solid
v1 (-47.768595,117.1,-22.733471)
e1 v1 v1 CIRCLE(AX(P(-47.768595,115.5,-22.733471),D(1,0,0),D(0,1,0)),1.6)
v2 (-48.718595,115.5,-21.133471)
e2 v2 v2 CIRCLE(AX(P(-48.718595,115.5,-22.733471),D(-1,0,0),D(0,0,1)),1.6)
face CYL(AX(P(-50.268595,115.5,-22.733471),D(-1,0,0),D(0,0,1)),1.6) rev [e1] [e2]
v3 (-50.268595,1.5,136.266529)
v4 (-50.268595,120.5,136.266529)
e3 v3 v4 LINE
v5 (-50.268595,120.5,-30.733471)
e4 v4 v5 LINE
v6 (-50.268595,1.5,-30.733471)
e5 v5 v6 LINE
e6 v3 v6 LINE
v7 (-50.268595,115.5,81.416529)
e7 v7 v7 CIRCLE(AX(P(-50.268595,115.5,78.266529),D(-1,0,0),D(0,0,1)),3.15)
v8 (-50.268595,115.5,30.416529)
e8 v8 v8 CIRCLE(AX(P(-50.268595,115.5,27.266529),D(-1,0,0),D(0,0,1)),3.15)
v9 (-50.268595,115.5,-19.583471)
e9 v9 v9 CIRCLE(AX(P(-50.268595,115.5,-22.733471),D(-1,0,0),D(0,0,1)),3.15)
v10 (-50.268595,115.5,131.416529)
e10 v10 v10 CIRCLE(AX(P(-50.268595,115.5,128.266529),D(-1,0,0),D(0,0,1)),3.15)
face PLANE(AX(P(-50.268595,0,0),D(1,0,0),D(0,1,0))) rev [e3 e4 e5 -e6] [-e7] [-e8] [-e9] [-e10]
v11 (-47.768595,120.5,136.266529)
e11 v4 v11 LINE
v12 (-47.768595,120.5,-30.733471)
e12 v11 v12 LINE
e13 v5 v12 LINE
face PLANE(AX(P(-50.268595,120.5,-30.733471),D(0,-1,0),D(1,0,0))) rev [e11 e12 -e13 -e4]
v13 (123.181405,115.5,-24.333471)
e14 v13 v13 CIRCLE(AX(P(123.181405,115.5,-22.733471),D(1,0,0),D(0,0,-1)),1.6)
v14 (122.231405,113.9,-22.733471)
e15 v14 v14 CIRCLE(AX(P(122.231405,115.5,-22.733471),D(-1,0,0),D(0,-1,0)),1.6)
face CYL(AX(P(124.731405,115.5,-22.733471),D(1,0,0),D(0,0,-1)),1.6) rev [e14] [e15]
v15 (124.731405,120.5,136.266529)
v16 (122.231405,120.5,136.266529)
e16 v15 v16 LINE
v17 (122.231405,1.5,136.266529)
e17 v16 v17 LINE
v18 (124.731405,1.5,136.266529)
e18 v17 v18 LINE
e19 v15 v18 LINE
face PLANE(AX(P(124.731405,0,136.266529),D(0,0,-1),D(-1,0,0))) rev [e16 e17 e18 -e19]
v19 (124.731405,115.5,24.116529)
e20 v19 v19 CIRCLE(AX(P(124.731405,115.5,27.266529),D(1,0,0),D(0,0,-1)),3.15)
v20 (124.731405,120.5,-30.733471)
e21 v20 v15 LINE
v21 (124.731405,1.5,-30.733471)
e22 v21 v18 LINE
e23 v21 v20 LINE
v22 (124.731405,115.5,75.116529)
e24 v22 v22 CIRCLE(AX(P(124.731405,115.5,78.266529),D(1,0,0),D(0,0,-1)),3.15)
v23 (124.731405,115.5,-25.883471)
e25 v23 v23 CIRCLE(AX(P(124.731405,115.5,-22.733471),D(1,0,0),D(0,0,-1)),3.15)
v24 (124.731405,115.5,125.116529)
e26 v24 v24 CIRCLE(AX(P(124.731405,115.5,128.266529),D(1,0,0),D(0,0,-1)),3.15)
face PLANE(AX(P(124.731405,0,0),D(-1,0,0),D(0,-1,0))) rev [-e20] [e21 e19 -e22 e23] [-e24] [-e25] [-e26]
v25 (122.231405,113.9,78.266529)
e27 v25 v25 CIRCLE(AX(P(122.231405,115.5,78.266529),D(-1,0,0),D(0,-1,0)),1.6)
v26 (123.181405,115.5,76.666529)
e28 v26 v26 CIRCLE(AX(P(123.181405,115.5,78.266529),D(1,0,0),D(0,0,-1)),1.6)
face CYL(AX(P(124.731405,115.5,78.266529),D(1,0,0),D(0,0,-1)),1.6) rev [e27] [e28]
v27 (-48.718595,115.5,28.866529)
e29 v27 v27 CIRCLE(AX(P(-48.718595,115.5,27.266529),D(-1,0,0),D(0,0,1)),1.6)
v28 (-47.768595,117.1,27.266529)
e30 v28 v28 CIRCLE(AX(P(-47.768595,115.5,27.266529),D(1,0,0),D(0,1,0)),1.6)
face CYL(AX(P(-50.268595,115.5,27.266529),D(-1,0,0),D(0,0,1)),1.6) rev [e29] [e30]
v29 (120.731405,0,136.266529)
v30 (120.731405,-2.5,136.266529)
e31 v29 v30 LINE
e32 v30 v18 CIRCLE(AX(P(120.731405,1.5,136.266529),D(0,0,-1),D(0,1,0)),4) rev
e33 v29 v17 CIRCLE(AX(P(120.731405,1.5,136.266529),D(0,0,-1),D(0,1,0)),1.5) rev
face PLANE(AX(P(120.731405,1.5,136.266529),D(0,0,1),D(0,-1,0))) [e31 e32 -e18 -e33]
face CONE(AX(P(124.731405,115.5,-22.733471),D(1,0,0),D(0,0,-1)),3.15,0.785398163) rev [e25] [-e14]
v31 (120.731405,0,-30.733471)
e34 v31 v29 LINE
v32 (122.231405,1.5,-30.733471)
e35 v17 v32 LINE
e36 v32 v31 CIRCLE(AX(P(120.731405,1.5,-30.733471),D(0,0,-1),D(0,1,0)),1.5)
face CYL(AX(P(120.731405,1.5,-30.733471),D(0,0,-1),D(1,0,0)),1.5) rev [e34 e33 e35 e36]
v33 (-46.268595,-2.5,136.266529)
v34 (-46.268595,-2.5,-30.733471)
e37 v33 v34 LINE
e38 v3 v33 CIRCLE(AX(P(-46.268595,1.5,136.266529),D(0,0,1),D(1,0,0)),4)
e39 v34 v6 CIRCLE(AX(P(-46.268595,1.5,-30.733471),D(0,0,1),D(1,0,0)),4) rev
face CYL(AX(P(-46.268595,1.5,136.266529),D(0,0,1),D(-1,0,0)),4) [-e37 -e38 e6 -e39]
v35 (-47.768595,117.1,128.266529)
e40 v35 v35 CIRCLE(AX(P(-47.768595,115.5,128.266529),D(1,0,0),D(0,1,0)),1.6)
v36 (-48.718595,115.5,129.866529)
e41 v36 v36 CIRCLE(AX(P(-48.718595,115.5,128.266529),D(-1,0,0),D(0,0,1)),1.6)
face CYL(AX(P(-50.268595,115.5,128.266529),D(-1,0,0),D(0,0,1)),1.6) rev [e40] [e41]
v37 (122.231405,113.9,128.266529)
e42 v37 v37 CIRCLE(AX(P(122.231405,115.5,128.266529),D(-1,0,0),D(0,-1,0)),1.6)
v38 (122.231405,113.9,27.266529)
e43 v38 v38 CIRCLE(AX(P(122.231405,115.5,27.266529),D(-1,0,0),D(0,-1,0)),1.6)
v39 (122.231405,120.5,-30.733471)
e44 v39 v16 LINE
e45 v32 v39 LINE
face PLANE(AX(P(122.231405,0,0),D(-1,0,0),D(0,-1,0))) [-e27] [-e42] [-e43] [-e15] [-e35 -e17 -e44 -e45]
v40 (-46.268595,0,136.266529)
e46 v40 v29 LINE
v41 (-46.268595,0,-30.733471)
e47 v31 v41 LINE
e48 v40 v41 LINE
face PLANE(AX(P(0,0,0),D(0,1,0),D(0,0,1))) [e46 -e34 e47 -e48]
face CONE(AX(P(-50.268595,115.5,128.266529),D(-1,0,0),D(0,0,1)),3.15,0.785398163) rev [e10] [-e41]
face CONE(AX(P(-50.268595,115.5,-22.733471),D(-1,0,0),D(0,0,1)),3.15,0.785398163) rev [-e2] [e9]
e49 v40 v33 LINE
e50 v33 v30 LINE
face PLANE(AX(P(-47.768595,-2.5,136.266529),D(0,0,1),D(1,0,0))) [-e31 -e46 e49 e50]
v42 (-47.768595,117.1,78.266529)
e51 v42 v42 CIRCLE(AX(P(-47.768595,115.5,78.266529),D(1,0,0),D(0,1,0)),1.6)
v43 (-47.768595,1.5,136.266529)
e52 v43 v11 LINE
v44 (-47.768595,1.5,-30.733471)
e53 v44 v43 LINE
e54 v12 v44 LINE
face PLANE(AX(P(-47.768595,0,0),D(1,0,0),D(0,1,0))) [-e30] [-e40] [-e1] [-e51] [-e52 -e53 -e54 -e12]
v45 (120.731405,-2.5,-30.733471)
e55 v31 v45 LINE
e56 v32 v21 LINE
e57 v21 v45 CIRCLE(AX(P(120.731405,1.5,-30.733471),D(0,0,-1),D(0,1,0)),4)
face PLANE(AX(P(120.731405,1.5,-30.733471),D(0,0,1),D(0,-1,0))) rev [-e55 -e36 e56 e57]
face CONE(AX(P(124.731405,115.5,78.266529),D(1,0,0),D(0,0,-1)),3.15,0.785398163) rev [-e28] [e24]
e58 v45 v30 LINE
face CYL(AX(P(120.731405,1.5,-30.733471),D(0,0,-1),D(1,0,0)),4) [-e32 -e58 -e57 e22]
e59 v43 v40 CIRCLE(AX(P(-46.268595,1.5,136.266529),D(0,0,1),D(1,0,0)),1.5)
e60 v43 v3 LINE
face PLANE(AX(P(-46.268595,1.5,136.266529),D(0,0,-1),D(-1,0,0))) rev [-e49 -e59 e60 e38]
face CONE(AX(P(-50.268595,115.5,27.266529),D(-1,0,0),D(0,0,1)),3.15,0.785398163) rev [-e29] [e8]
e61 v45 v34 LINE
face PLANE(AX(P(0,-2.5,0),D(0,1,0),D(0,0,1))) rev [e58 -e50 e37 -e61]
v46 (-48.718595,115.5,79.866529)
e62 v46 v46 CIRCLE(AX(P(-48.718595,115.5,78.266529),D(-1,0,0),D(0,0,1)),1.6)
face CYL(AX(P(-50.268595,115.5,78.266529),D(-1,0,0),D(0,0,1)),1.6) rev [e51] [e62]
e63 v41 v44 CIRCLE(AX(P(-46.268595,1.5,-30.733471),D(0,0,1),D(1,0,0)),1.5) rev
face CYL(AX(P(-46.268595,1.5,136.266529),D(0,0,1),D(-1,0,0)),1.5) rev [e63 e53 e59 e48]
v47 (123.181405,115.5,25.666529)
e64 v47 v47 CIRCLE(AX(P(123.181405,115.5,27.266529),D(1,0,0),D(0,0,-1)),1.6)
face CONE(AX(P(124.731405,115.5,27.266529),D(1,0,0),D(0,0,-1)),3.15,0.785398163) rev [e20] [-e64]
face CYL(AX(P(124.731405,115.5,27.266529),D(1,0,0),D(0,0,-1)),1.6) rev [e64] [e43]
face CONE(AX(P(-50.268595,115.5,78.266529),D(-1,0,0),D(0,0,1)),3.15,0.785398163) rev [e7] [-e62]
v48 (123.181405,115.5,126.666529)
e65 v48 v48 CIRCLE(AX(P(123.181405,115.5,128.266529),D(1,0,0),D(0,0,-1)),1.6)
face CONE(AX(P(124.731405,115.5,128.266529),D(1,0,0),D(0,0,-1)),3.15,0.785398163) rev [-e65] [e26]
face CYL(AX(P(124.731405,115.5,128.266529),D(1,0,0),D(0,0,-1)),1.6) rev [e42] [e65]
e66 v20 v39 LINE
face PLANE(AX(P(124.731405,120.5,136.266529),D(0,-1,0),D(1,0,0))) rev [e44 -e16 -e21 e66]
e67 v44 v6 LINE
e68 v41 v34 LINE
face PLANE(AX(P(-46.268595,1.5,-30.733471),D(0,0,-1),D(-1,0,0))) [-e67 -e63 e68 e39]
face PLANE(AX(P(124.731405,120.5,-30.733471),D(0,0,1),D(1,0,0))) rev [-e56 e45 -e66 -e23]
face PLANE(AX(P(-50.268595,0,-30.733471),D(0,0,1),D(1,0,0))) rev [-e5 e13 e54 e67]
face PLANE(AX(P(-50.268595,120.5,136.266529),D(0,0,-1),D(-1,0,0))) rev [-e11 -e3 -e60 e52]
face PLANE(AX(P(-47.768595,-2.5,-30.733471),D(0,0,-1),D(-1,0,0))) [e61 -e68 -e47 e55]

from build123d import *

# Parameters (mm, degrees)
SKETCH_238_W                                   = 170
SKETCH_238_H                                   = 167
BASE_FLANGE1_DEPTH                             = 2.5
EDGE_FLANGE1_STRIP_W                           = 13
EDGE_FLANGE1_STRIP_H                           = 2.5
EDGE_FLANGE1_STRIP_CUT_DEPTH                   = 167
EDGE_FLANGE1_DEPTH                             = 167
EDGE_FLANGE2_STRIP_W                           = 13
EDGE_FLANGE2_STRIP_H                           = 2.5
EDGE_FLANGE2_STRIP_CUT_DEPTH                   = 167
EDGE_FLANGE2_DEPTH                             = 167
CSK_FOR_M3_FLAT_HEAD_MACHINE_SCREW1_AT_2_COUNT = 2
CSK_FOR_M3_FLAT_HEAD_MACHINE_SCREW1_AT_2_PITCH = 50
CSK_FOR_M3_FLAT_HEAD_MACHINE_SCREW1_AT_3_COUNT = 2
CSK_FOR_M3_FLAT_HEAD_MACHINE_SCREW1_AT_3_PITCH = 101
CSK_FOR_M3_FLAT_HEAD_MACHINE_SCREW1_AT_4_COUNT = 2
CSK_FOR_M3_FLAT_HEAD_MACHINE_SCREW1_AT_4_PITCH = 151
CSK_FOR_M3_FLAT_HEAD_MACHINE_SCREW2_AT_2_COUNT = 2
CSK_FOR_M3_FLAT_HEAD_MACHINE_SCREW2_AT_2_PITCH = 50
CSK_FOR_M3_FLAT_HEAD_MACHINE_SCREW2_AT_3_COUNT = 2
CSK_FOR_M3_FLAT_HEAD_MACHINE_SCREW2_AT_3_PITCH = 101
CSK_FOR_M3_FLAT_HEAD_MACHINE_SCREW2_AT_4_COUNT = 2
CSK_FOR_M3_FLAT_HEAD_MACHINE_SCREW2_AT_4_PITCH = 151


# Sheet-metal steps are written as plain solids
with BuildPart() as part:
    # Sketch 238 → Base-Flange1 (new body)
    with BuildSketch(Plane(origin=(0, 0, 0), x_dir=(1, 0, 0), z_dir=(0, 1, 0))):
        with Locations((37.231404959, -52.766528926)):
            Rectangle(SKETCH_238_W, SKETCH_238_H)
    extrude(amount=-BASE_FLANGE1_DEPTH)

    # Edge-Flange1 strip (across the edge) → Edge-Flange1 strip cut (cut)
    with BuildSketch(Plane(origin=(-47.768595041, 0, -30.733471074), x_dir=(1, 0, 0), z_dir=(0, 0, 1))):
        with Locations((-5, -1.25)):
            Rectangle(EDGE_FLANGE1_STRIP_W, EDGE_FLANGE1_STRIP_H)
    extrude(amount=EDGE_FLANGE1_STRIP_CUT_DEPTH, mode=Mode.SUBTRACT)

    # Edge-Flange1 section (across the edge) → Edge-Flange1 (add)
    with BuildSketch(Plane(origin=(-47.768595041, 0, -30.733471074), x_dir=(1, 0, 0), z_dir=(0, 0, 1))):
        with BuildLine():
            Line((-2.5, 1.5), (-2.5, 120.5))
            Line((-2.5, 120.5), (0, 120.5))
            Line((0, 120.5), (0, 1.5))
            ThreePointArc((0, 1.5), (0.439339828, 0.439339828), (1.5, 0))
            Line((1.5, 0), (1.5, -2.5))
            ThreePointArc((1.5, -2.5), (-1.328427125, -1.328427125), (-2.5, 1.5))
        make_face()
    extrude(amount=EDGE_FLANGE1_DEPTH)

    # Edge-Flange2 strip (across the edge) → Edge-Flange2 strip cut (cut)
    with BuildSketch(Plane(origin=(122.231404959, 0, 136.266528926), x_dir=(-1, 0, 0), z_dir=(0, 0, -1))):
        with Locations((-5, -1.25)):
            Rectangle(EDGE_FLANGE2_STRIP_W, EDGE_FLANGE2_STRIP_H)
    extrude(amount=EDGE_FLANGE2_STRIP_CUT_DEPTH, mode=Mode.SUBTRACT)

    # Edge-Flange2 section (across the edge) → Edge-Flange2 (add)
    with BuildSketch(Plane(origin=(122.231404959, 0, 136.266528926), x_dir=(-1, 0, 0), z_dir=(0, 0, -1))):
        with BuildLine():
            Line((-2.5, 1.5), (-2.5, 120.5))
            Line((-2.5, 120.5), (0, 120.5))
            Line((0, 120.5), (0, 1.5))
            ThreePointArc((0, 1.5), (0.439339828, 0.439339828), (1.5, 0))
            Line((1.5, 0), (1.5, -2.5))
            ThreePointArc((1.5, -2.5), (-1.328427125, -1.328427125), (-2.5, 1.5))
        make_face()
    extrude(amount=EDGE_FLANGE2_DEPTH)

    # Sketch13 → CSK for M3 Flat Head Machine Screw1 (revolve, cut)
    with BuildSketch(Plane(origin=(-50.268595041, 115.5, 128.266528926), x_dir=(0, 0, 1), z_dir=(0, 1, 0))):
        Polygon((0, 0), (0, 2.5), (1.6, 2.5), (1.6, 1.55), (3.15, 0), align=None)
    csk_for_m3_flat_head_machine_screw1 = revolve(axis=Axis((-56.618595041, 115.5, 128.266528926), (1, 0, 0)), mode=Mode.SUBTRACT)

    # CSK for M3 Flat Head Machine Screw1 at 2: CSK for M3 Flat Head Machine Screw1 ×2
    with Locations(*[(0, 0, -i * CSK_FOR_M3_FLAT_HEAD_MACHINE_SCREW1_AT_2_PITCH) for i in range(1, CSK_FOR_M3_FLAT_HEAD_MACHINE_SCREW1_AT_2_COUNT)]):
        add(csk_for_m3_flat_head_machine_screw1, mode=Mode.SUBTRACT)

    # CSK for M3 Flat Head Machine Screw1 at 3: CSK for M3 Flat Head Machine Screw1 ×2
    with Locations(*[(0, 0, -i * CSK_FOR_M3_FLAT_HEAD_MACHINE_SCREW1_AT_3_PITCH) for i in range(1, CSK_FOR_M3_FLAT_HEAD_MACHINE_SCREW1_AT_3_COUNT)]):
        add(csk_for_m3_flat_head_machine_screw1, mode=Mode.SUBTRACT)

    # CSK for M3 Flat Head Machine Screw1 at 4: CSK for M3 Flat Head Machine Screw1 ×2
    with Locations(*[(0, 0, -i * CSK_FOR_M3_FLAT_HEAD_MACHINE_SCREW1_AT_4_PITCH) for i in range(1, CSK_FOR_M3_FLAT_HEAD_MACHINE_SCREW1_AT_4_COUNT)]):
        add(csk_for_m3_flat_head_machine_screw1, mode=Mode.SUBTRACT)

    # Sketch15 → CSK for M3 Flat Head Machine Screw2 (revolve, cut)
    with BuildSketch(Plane(origin=(124.731404959, 115.5, -22.733471074), x_dir=(0, 0, -1), z_dir=(0, 1, 0))):
        Polygon((0, 0), (0, 2.5), (1.6, 2.5), (1.6, 1.55), (3.15, 0), align=None)
    csk_for_m3_flat_head_machine_screw2 = revolve(axis=Axis((131.081404959, 115.5, -22.733471074), (-1, 0, 0)), mode=Mode.SUBTRACT)

    # CSK for M3 Flat Head Machine Screw2 at 2: CSK for M3 Flat Head Machine Screw2 ×2
    with Locations(*[(0, 0, i * CSK_FOR_M3_FLAT_HEAD_MACHINE_SCREW2_AT_2_PITCH) for i in range(1, CSK_FOR_M3_FLAT_HEAD_MACHINE_SCREW2_AT_2_COUNT)]):
        add(csk_for_m3_flat_head_machine_screw2, mode=Mode.SUBTRACT)

    # CSK for M3 Flat Head Machine Screw2 at 3: CSK for M3 Flat Head Machine Screw2 ×2
    with Locations(*[(0, 0, i * CSK_FOR_M3_FLAT_HEAD_MACHINE_SCREW2_AT_3_PITCH) for i in range(1, CSK_FOR_M3_FLAT_HEAD_MACHINE_SCREW2_AT_3_COUNT)]):
        add(csk_for_m3_flat_head_machine_screw2, mode=Mode.SUBTRACT)

    # CSK for M3 Flat Head Machine Screw2 at 4: CSK for M3 Flat Head Machine Screw2 ×2
    with Locations(*[(0, 0, i * CSK_FOR_M3_FLAT_HEAD_MACHINE_SCREW2_AT_4_PITCH) for i in range(1, CSK_FOR_M3_FLAT_HEAD_MACHINE_SCREW2_AT_4_COUNT)]):
        add(csk_for_m3_flat_head_machine_screw2, mode=Mode.SUBTRACT)


solid = part.part
